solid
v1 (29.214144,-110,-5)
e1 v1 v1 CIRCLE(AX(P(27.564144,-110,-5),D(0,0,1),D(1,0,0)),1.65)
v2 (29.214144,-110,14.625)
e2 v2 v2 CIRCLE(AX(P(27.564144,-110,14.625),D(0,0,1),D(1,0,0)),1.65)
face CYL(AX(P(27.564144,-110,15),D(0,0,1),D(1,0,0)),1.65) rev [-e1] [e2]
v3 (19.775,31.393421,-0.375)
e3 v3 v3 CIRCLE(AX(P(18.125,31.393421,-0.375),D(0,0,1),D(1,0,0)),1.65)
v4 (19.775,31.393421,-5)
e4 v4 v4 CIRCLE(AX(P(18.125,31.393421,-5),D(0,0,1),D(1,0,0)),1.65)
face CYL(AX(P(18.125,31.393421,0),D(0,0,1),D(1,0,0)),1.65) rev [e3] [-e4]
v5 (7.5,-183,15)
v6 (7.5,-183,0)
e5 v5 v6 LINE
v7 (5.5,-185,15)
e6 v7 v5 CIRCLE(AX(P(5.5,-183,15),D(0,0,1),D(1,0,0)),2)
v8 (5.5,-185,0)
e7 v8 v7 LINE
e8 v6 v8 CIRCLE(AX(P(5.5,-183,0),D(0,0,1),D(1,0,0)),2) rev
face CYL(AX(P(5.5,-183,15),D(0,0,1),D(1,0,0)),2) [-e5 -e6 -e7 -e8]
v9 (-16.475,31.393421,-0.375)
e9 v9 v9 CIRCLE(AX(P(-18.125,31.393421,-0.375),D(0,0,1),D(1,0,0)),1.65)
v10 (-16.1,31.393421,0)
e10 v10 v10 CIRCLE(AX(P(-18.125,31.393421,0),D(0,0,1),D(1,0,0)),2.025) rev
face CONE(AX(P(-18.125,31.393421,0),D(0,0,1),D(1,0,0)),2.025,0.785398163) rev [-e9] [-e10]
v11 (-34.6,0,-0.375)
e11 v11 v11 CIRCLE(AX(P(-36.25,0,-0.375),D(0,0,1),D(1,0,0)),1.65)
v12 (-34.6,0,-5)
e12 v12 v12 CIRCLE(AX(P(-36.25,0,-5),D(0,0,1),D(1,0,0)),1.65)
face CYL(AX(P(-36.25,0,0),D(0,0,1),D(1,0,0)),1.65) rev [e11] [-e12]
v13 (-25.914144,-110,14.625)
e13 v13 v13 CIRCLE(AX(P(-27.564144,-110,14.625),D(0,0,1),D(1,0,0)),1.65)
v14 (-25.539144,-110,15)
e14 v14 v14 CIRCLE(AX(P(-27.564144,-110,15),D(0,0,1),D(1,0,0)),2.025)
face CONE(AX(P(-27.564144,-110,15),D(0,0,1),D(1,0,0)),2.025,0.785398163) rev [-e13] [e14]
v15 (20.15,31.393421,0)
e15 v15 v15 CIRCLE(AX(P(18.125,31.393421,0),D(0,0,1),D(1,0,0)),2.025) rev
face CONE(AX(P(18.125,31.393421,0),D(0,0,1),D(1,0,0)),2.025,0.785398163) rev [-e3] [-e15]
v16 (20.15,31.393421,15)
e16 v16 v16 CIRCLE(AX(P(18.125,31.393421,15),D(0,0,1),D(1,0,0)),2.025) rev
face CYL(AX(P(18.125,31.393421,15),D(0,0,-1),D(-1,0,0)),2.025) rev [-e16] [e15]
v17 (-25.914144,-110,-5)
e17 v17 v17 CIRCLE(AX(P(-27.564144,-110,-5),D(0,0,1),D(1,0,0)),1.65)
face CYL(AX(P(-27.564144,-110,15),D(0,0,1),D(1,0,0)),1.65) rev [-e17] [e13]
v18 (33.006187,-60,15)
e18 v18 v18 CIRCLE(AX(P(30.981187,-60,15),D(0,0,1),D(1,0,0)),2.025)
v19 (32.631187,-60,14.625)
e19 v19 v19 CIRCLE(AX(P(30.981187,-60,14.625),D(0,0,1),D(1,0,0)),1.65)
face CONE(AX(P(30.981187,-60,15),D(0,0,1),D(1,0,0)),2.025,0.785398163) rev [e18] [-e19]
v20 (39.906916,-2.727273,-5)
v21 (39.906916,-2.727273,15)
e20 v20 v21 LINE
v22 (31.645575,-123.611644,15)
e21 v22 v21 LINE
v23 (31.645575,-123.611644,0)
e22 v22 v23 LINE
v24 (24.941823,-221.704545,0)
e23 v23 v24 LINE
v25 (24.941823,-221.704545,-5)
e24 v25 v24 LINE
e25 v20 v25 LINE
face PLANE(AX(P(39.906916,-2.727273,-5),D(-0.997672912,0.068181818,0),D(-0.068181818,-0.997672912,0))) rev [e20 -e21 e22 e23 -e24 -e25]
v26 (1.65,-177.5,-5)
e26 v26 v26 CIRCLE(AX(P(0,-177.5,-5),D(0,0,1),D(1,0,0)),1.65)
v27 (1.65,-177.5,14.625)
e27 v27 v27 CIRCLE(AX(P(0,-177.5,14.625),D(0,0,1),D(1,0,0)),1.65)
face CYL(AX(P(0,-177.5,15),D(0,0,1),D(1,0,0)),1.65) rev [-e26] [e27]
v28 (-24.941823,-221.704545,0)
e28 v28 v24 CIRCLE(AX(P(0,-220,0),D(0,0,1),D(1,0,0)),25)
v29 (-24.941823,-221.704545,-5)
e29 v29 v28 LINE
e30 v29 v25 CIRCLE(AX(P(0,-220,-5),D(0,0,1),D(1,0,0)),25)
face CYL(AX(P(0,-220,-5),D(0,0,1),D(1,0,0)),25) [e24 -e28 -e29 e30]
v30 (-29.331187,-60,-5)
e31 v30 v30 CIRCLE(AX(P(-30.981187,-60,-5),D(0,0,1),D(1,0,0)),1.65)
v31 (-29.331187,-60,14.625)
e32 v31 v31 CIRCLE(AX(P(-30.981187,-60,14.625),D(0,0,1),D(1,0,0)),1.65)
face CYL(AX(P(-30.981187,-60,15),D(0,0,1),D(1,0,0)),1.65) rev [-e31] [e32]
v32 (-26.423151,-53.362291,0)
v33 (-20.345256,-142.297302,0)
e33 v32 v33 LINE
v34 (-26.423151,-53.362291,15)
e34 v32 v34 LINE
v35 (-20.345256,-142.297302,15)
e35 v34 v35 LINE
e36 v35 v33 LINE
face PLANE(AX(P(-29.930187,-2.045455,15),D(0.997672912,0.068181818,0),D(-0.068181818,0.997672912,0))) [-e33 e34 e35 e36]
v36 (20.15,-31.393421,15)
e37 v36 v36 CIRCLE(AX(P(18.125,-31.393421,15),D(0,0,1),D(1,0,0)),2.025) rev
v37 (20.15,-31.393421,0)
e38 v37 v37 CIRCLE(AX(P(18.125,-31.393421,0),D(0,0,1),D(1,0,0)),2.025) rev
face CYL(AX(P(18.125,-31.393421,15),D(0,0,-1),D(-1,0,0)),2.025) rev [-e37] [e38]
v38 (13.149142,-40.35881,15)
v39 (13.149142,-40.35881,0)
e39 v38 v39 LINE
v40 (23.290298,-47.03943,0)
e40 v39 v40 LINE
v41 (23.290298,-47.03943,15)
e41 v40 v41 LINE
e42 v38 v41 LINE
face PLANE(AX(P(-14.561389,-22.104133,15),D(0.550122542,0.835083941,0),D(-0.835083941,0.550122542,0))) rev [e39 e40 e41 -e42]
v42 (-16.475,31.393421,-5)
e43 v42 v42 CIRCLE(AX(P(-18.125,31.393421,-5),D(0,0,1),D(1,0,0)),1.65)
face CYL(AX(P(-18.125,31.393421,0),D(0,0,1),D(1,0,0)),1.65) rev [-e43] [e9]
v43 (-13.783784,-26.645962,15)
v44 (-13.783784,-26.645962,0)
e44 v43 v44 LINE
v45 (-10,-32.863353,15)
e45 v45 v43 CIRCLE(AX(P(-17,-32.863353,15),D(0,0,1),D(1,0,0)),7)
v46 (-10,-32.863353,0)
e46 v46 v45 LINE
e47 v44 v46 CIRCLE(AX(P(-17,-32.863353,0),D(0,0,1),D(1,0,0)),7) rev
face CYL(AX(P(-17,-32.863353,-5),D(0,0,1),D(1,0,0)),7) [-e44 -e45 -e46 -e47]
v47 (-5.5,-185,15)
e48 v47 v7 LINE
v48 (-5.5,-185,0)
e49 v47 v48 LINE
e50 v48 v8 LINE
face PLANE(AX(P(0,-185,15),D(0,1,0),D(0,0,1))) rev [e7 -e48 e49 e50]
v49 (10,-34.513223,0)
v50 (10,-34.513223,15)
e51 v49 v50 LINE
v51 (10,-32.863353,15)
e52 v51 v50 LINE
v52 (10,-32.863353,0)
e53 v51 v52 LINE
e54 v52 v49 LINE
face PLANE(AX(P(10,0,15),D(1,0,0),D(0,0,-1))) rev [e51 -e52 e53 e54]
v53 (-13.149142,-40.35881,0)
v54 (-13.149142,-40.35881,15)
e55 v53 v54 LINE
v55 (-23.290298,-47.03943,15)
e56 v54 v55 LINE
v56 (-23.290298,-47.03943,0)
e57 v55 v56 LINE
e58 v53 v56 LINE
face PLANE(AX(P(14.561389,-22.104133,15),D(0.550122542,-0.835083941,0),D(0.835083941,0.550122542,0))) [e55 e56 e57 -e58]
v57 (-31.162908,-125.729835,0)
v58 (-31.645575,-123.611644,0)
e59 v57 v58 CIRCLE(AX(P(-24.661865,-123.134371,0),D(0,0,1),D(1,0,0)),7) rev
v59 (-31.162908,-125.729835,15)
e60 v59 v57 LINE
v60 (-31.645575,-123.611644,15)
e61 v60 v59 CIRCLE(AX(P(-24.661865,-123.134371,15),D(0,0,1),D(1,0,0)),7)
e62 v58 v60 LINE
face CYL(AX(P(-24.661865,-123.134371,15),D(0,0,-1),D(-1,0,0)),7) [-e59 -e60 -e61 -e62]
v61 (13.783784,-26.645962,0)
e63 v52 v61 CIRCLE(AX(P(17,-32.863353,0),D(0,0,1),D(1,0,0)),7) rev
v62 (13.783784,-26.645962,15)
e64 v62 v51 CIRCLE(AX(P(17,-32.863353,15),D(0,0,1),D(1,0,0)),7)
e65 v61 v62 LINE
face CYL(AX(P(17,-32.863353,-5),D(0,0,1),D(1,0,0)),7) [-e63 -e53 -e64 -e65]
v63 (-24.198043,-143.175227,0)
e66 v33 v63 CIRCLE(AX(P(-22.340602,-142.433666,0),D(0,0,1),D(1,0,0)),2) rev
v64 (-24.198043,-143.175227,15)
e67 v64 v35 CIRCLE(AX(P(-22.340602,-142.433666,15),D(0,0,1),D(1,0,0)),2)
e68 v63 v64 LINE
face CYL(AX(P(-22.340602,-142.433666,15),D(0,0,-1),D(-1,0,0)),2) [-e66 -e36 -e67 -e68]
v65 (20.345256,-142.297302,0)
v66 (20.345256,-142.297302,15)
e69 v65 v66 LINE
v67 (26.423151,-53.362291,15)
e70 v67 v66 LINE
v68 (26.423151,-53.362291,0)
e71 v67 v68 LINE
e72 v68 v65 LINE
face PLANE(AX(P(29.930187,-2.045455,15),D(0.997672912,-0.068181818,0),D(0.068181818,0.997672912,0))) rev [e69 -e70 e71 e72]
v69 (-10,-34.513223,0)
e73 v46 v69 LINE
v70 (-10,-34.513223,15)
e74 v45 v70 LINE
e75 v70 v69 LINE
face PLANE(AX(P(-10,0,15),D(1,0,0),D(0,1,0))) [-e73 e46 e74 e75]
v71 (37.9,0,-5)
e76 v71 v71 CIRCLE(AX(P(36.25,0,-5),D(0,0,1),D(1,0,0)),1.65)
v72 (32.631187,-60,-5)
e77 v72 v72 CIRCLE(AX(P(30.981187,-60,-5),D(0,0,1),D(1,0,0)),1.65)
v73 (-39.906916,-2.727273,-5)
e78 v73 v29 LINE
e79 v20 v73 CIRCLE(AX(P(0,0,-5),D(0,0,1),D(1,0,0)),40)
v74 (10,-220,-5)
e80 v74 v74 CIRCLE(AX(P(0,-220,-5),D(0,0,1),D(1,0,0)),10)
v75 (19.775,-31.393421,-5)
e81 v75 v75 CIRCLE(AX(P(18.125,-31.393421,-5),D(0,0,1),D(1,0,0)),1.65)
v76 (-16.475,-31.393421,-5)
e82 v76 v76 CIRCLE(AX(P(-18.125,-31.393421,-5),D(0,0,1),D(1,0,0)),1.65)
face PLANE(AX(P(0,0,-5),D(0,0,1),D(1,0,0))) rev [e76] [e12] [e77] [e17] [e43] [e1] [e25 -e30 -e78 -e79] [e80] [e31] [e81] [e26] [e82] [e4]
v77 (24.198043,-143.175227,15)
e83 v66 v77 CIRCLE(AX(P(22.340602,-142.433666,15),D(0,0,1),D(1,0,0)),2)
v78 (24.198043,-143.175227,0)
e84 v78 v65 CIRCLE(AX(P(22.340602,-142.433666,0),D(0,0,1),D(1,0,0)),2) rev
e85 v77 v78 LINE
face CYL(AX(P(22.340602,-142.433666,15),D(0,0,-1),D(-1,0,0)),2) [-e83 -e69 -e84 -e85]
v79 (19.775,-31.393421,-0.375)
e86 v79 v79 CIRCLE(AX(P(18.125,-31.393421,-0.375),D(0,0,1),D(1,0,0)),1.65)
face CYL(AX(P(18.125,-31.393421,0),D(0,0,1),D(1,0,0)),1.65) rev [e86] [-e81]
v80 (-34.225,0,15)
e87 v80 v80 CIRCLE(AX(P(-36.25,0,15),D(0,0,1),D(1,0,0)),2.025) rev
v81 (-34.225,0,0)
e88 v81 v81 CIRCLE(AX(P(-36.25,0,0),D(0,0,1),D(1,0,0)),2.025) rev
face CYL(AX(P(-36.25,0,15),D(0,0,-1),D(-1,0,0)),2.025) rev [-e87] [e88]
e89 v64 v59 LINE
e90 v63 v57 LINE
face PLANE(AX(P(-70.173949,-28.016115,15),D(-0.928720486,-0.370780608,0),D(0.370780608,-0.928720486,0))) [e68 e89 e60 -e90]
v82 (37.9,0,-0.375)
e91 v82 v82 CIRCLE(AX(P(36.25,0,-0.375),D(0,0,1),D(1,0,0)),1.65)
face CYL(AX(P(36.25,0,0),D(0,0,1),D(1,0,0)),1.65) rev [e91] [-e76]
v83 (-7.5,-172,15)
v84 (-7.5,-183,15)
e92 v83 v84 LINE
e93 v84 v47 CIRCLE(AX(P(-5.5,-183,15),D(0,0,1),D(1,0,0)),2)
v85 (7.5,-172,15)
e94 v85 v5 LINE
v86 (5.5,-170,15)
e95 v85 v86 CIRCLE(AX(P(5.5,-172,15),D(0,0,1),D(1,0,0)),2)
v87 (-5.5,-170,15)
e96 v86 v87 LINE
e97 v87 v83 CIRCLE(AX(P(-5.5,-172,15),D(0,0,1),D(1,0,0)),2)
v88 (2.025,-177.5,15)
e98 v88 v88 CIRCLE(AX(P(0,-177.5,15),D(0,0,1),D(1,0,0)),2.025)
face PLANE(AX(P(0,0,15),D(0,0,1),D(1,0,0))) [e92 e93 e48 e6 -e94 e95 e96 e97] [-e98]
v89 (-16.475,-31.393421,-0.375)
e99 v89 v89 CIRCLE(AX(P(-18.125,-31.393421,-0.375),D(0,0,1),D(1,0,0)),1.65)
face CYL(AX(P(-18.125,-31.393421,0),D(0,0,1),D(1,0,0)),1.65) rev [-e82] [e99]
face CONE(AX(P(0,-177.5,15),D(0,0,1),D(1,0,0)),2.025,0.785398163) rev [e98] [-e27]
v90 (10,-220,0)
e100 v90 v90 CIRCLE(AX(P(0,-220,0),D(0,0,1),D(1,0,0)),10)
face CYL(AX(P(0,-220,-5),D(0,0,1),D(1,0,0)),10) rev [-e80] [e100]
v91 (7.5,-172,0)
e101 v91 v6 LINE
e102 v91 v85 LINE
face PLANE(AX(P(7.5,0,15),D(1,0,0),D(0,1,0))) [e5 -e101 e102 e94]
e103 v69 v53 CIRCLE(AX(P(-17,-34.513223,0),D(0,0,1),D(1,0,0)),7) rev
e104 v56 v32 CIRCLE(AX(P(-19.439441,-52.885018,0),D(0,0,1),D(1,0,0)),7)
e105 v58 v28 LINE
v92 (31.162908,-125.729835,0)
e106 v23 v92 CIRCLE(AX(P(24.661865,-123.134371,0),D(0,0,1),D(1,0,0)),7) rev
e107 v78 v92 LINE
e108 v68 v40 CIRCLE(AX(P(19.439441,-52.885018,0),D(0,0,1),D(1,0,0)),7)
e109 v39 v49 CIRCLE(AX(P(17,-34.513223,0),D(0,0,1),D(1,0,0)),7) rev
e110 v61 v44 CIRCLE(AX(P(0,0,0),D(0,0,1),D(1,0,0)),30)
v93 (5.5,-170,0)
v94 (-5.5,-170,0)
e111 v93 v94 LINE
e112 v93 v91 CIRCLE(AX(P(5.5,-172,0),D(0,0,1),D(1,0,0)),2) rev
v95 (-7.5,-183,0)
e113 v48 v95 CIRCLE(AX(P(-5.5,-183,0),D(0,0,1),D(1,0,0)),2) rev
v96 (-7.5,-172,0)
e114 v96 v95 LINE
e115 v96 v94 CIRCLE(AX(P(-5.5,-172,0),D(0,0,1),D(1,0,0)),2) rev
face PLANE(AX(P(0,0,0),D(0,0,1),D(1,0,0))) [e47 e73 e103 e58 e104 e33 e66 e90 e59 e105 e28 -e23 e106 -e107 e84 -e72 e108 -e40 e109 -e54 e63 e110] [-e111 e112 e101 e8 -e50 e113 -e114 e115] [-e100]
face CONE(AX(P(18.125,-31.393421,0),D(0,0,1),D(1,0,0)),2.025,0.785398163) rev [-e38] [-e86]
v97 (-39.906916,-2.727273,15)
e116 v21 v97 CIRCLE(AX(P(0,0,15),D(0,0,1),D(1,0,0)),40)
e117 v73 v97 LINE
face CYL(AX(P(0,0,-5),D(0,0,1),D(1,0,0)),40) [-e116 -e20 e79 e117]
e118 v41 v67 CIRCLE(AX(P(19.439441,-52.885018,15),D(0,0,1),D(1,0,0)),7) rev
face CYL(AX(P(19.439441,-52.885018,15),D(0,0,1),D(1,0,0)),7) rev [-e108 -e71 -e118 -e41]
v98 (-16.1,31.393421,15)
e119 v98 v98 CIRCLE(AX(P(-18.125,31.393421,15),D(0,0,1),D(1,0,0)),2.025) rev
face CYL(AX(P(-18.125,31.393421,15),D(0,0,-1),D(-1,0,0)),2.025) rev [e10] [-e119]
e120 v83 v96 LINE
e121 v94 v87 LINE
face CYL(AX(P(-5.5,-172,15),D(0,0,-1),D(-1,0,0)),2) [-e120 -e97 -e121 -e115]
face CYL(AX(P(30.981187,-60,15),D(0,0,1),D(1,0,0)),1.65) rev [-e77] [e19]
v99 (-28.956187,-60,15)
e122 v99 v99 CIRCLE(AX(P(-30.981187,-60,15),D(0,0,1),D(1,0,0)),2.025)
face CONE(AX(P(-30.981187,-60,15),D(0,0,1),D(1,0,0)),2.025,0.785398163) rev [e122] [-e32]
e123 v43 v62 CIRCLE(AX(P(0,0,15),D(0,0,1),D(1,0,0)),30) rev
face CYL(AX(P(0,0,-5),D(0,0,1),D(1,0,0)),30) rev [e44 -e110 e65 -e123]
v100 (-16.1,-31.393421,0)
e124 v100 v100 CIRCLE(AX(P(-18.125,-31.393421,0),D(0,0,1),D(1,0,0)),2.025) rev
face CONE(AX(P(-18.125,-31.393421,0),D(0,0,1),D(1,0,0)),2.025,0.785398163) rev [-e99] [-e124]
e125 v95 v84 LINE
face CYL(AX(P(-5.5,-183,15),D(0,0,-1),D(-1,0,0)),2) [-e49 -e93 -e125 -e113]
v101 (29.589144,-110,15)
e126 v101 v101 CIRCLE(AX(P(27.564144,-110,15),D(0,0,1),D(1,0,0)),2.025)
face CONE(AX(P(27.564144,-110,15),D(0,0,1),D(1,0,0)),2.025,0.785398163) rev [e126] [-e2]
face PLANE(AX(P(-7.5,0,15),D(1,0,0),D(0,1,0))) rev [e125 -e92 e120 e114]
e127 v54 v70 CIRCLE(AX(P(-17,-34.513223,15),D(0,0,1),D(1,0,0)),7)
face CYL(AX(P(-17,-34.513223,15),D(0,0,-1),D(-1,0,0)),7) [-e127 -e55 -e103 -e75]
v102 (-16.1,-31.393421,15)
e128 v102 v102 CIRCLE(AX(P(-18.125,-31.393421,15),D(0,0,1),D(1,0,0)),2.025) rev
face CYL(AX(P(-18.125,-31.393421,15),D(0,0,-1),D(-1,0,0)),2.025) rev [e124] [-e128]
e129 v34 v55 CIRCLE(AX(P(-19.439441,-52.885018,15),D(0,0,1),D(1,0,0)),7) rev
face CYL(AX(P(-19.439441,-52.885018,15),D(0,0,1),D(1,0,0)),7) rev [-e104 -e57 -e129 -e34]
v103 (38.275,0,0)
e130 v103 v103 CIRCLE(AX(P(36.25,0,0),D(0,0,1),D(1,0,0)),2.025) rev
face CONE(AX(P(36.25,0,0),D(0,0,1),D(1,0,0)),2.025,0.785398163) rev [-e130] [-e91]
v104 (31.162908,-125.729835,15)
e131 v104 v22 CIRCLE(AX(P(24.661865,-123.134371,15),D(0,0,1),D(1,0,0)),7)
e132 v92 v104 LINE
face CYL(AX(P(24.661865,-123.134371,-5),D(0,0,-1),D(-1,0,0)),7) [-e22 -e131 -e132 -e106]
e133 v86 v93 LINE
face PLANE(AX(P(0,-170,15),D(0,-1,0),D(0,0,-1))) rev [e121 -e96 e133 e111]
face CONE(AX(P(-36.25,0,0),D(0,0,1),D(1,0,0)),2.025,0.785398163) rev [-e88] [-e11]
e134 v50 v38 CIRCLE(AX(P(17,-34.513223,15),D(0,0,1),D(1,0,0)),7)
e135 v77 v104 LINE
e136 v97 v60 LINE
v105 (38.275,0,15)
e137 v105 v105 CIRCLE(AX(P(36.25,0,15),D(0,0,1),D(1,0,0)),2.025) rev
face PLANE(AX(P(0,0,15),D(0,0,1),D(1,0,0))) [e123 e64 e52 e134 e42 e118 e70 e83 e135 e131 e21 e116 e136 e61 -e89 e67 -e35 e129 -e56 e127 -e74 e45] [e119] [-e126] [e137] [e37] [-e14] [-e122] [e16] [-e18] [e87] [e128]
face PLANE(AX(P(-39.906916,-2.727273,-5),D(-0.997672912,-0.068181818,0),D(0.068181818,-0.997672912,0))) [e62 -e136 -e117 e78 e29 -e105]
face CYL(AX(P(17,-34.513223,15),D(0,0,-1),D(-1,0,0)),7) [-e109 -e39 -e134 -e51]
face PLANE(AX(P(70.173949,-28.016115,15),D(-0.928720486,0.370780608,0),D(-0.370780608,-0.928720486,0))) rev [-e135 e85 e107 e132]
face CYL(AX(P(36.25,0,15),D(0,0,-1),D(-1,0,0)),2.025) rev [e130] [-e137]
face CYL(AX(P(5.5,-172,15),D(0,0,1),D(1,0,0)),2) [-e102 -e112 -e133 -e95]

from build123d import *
from build123d.topology import SkipClean

# Parameters (mm, degrees)
SKETCH1_R                       = 40
SKETCH1_R_2                     = 30
BOSS_EXTRUDE1_DEPTH             = 5
M4X0_7_TAPPED_HOLE1_D           = 3.3
M4X0_7_TAPPED_HOLE1_CSINK_D     = 4.05
M4X0_7_TAPPED_HOLE1_CSINK_ANGLE = 90
CIRPATTERN1_COUNT               = 6
SKETCH14_R                      = 10
BOSS_EXTRUDE5_DEPTH             = 5
BOSS_EXTRUDE7_START             = 15
SKETCH15_R                      = 2.025
SKETCH15_W                      = 15
SKETCH15_H                      = 15
BOSS_EXTRUDE7_DEPTH             = 15
FILLET3_R                       = 2
FILLET4_R                       = 7
M4X0_7_TAPPED_HOLE2_D           = 3.3
M4X0_7_TAPPED_HOLE2_CSINK_D     = 4.05
M4X0_7_TAPPED_HOLE2_CSINK_ANGLE = 90
SKETCH1_3_R                     = 30
BOSS_EXTRUDE8_DEPTH             = 5


with BuildPart() as part:
    # Sketch1 → Boss-Extrude1 (new body)
    with BuildSketch(Plane.XY):
        Circle(SKETCH1_R)
        Circle(SKETCH1_R_2, mode=Mode.SUBTRACT)
    extrude(amount=-BOSS_EXTRUDE1_DEPTH)

    # M4x0.7 Tapped Hole1 (through all)
    with Locations(Plane.XY):
        with Locations((36.25, 0)):
            m4x0_7_tapped_hole1 = CounterSinkHole(M4X0_7_TAPPED_HOLE1_D / 2, M4X0_7_TAPPED_HOLE1_CSINK_D / 2, counter_sink_angle=M4X0_7_TAPPED_HOLE1_CSINK_ANGLE)

    # CirPattern1: M4x0.7 Tapped Hole1 ×6 about axis
    cirpattern1_axis = Axis((0, 0, 0), (0, 0, 1))
    for i in range(1, CIRPATTERN1_COUNT):
        add(m4x0_7_tapped_hole1.rotate(cirpattern1_axis, i * 360 / CIRPATTERN1_COUNT), mode=Mode.SUBTRACT)

    # Sketch14 → Boss-Extrude5 (add)
    with BuildSketch(Plane.XY):
        with BuildLine():
            ThreePointArc((39.906916487, -2.727272727), (0, -40), (-39.906916487, -2.727272727))
            Line((-39.906916487, -2.727272727), (-24.941822804, -221.704545455))
            ThreePointArc((-24.941822804, -221.704545455), (0, -245), (24.941822804, -221.704545455))
            Line((24.941822804, -221.704545455), (39.906916487, -2.727272727))
        make_face()
        with Locations((0, -220)):
            Circle(SKETCH14_R, mode=Mode.SUBTRACT)
    extrude(amount=-BOSS_EXTRUDE5_DEPTH)

    # Sketch15 → Boss-Extrude7 (add)
    # profile 1 of 2: a face of its own
    with SkipClean():  # the faces are left unmerged after this step: merging them gives an invalid solid
        with BuildSketch(Plane.XY.offset(BOSS_EXTRUDE7_START)):
            with BuildLine():
                Line((-39.906916487, -2.727272727), (-31.570605203, -124.708648069))
                Line((-31.570605203, -124.708648069), (-19.477143205, -155))
                Line((-19.477143205, -155), (-26.701678828, -49.28672208))
                Line((-26.701678828, -49.28672208), (-10, -38.284271247))
                Line((-10, -38.284271247), (-10, -28.284271247))
                ThreePointArc((-10, -28.284271247), (0, 30), (10, -28.284271247))
                Line((10, -28.284271247), (10, -38.284271247))
                Line((10, -38.284271247), (26.701678828, -49.28672208))
                Line((26.701678828, -49.28672208), (19.477143205, -155))
                Line((19.477143205, -155), (31.570605203, -124.708648069))
                Line((31.570605203, -124.708648069), (39.906916487, -2.727272727))
                ThreePointArc((39.906916487, -2.727272727), (0, 40), (-39.906916487, -2.727272727))
            make_face()
            with Locations((-18.125, -31.393420887)):
                Circle(SKETCH15_R, mode=Mode.SUBTRACT)
            with Locations((-36.25, 0)):
                Circle(SKETCH15_R, mode=Mode.SUBTRACT)
            with Locations((-18.125, 31.393420887)):
                Circle(SKETCH15_R, mode=Mode.SUBTRACT)
            with Locations((36.25, 0)):
                Circle(SKETCH15_R, mode=Mode.SUBTRACT)
            with Locations((18.125, -31.393420887)):
                Circle(SKETCH15_R, mode=Mode.SUBTRACT)
            with Locations((18.125, 31.393420887)):
                Circle(SKETCH15_R, mode=Mode.SUBTRACT)
        # profile 2 of 2: a face of its own
        with BuildSketch(Plane.XY.offset(BOSS_EXTRUDE7_START)):
            with Locations((0, -177.5)):
                Rectangle(SKETCH15_W, SKETCH15_H)
        extrude(amount=-BOSS_EXTRUDE7_DEPTH)

    # Fillet3
    fillet3_edges = [part.edges().sort_by_distance(p)[0] for p in [
        (7.5, -170, 7.5),
        (-7.5, -170, 7.5),
        (-7.5, -185, 7.5),
        (7.5, -185, 7.5),
        (-19.477143205, -155, 7.5),
        (19.477143205, -155, 7.5),
    ]]
    fillet(fillet3_edges, radius=FILLET3_R)

    # Fillet4
    # the kernel refuses this fillet: 7 mm, written as the material it adds along each edge
    with BuildSketch(Plane(origin=(-26.701678828, -49.28672208, 15), x_dir=(0.8350839414170256, 0.5501225416099633, 0), z_dir=(0, 0, -1))) as fillet4_piece_1_section:
        with BuildLine():
            CenterArc((FILLET4_R * 0.583582124754, FILLET4_R), FILLET4_R, 209.465856716, 60.534143284)
            Line((-FILLET4_R * 0.287066858092, FILLET4_R * 0.508095183324), (0, 0))
            Line((0, 0), (FILLET4_R * 0.583582124754, 0))
        make_face()
    fillet4_piece_1 = extrude(amount=25.212687183, mode=Mode.PRIVATE)
    fillet4_piece_1 = split(fillet4_piece_1, bisect_by=Plane(origin=(-25.926798834, -49.670659835, -5), z_dir=(0, 0, 1)), keep=Keep.TOP, mode=Mode.PRIVATE)
    add(fillet4_piece_1)
    with BuildSketch(Plane(origin=(26.701678828, -49.28672208, 15), x_dir=(-0.06818181818181926, -0.9976729121658167, 0), z_dir=(0, 0, -1))) as fillet4_piece_2_section:
        with BuildLine():
            CenterArc((FILLET4_R * 0.583582124754, FILLET4_R), FILLET4_R, 209.465856716, 60.534143284)
            Line((-FILLET4_R * 0.287066858092, FILLET4_R * 0.508095183324), (0, 0))
            Line((0, 0), (FILLET4_R * 0.583582124754, 0))
        make_face()
    fillet4_piece_2 = extrude(amount=25.212687183, mode=Mode.PRIVATE)
    fillet4_piece_2 = split(fillet4_piece_2, bisect_by=Plane(origin=(25.926798834, -49.670659835, -5), z_dir=(0, 0, 1)), keep=Keep.TOP, mode=Mode.PRIVATE)
    add(fillet4_piece_2)
    # the kernel refuses this fillet: 7 mm, written as the material it takes off along each edge
    with BuildSketch(Plane(origin=(-31.570605203, -124.708648069, 17.748908315), x_dir=(-0.06818181818181737, 0.9976729121658168, 0), z_dir=(0, 0, -1)), Plane(origin=(31.570605203, -124.708648069, 17.748908315), x_dir=(-0.37078060844808275, -0.9287204856138737, 0), z_dir=(0, 0, -1))) as fillet4_2_piece_1:
        with BuildLine():
            CenterArc((FILLET4_R * 0.157080475159, FILLET4_R), FILLET4_R, 252.145796046, 17.854203954)
            Line((-FILLET4_R * 0.149515442954, FILLET4_R * 0.048160232499), (0, 0))
            Line((0, 0), (FILLET4_R * 0.157080475159, 0))
        make_face()
    extrude(amount=17.748908315, mode=Mode.SUBTRACT)
    with BuildSketch(Plane(origin=(-10, -38.284271247, 24.427621741), x_dir=(0, 1, 0), z_dir=(0, 0, -1)), Plane(origin=(10, -38.284271247, 24.427621741), x_dir=(0.8350839414170215, -0.5501225416099695, 0), z_dir=(0, 0, -1))) as fillet4_2_piece_2:
        with BuildLine():
            CenterArc((FILLET4_R * 0.538721242354, -FILLET4_R), FILLET4_R, 90, 56.624579759)
            Line((-FILLET4_R * 0.296362699063, -FILLET4_R * 0.44987745839), (0, 0))
            Line((0, 0), (FILLET4_R * 0.538721242354, 0))
        make_face()
    extrude(amount=24.427621741, mode=Mode.SUBTRACT)
    with BuildSketch(Plane(origin=(-10, -28.284271247, 26.447705507), x_dir=(-0.9176733218940842, 0.39733571986907557, 0), z_dir=(0, 0, -1))) as fillet4_2_piece_3:
        with BuildLine():
            CenterArc((4.60428033, -6.983451615), FILLET4_R, 93.940506137, 62.647767091)
            Line((-1.819432923, -4.202101576), (0, 0))
            ThreePointArc((0, 0), (2.061618058, -0.070921648), (4.123236116, 0))
        make_face()
    extrude(amount=26.447705507, mode=Mode.SUBTRACT)
    with BuildSketch(Plane(origin=(10, -28.284271247, 26.447705507), x_dir=(0, -1, 0), z_dir=(0, 0, -1))) as fillet4_2_piece_4:
        with BuildLine():
            CenterArc((4.579082203, -7), FILLET4_R, 90, 62.647767091)
            ThreePointArc((-1.63830899, -3.783783784), (-0.754071591, -1.920071596), (0, 0))
            Line((0, 0), (4.579082203, 0))
        make_face()
    extrude(amount=26.447705507, mode=Mode.SUBTRACT)

    # M4x0.7 Tapped Hole2 (through all)
    with Locations(Plane.XY.offset(15)):
        with Locations((0, -177.5), (-27.564144185, -110), (27.564144185, -110), (-30.981186852, -60), (30.981186852, -60)):
            CounterSinkHole(M4X0_7_TAPPED_HOLE2_D / 2, M4X0_7_TAPPED_HOLE2_CSINK_D / 2, counter_sink_angle=M4X0_7_TAPPED_HOLE2_CSINK_ANGLE)

    # Sketch1<3> → Boss-Extrude8 (add)
    with BuildSketch(Plane.XY):
        Circle(SKETCH1_3_R)
    extrude(amount=-BOSS_EXTRUDE8_DEPTH)


solid = part.part
